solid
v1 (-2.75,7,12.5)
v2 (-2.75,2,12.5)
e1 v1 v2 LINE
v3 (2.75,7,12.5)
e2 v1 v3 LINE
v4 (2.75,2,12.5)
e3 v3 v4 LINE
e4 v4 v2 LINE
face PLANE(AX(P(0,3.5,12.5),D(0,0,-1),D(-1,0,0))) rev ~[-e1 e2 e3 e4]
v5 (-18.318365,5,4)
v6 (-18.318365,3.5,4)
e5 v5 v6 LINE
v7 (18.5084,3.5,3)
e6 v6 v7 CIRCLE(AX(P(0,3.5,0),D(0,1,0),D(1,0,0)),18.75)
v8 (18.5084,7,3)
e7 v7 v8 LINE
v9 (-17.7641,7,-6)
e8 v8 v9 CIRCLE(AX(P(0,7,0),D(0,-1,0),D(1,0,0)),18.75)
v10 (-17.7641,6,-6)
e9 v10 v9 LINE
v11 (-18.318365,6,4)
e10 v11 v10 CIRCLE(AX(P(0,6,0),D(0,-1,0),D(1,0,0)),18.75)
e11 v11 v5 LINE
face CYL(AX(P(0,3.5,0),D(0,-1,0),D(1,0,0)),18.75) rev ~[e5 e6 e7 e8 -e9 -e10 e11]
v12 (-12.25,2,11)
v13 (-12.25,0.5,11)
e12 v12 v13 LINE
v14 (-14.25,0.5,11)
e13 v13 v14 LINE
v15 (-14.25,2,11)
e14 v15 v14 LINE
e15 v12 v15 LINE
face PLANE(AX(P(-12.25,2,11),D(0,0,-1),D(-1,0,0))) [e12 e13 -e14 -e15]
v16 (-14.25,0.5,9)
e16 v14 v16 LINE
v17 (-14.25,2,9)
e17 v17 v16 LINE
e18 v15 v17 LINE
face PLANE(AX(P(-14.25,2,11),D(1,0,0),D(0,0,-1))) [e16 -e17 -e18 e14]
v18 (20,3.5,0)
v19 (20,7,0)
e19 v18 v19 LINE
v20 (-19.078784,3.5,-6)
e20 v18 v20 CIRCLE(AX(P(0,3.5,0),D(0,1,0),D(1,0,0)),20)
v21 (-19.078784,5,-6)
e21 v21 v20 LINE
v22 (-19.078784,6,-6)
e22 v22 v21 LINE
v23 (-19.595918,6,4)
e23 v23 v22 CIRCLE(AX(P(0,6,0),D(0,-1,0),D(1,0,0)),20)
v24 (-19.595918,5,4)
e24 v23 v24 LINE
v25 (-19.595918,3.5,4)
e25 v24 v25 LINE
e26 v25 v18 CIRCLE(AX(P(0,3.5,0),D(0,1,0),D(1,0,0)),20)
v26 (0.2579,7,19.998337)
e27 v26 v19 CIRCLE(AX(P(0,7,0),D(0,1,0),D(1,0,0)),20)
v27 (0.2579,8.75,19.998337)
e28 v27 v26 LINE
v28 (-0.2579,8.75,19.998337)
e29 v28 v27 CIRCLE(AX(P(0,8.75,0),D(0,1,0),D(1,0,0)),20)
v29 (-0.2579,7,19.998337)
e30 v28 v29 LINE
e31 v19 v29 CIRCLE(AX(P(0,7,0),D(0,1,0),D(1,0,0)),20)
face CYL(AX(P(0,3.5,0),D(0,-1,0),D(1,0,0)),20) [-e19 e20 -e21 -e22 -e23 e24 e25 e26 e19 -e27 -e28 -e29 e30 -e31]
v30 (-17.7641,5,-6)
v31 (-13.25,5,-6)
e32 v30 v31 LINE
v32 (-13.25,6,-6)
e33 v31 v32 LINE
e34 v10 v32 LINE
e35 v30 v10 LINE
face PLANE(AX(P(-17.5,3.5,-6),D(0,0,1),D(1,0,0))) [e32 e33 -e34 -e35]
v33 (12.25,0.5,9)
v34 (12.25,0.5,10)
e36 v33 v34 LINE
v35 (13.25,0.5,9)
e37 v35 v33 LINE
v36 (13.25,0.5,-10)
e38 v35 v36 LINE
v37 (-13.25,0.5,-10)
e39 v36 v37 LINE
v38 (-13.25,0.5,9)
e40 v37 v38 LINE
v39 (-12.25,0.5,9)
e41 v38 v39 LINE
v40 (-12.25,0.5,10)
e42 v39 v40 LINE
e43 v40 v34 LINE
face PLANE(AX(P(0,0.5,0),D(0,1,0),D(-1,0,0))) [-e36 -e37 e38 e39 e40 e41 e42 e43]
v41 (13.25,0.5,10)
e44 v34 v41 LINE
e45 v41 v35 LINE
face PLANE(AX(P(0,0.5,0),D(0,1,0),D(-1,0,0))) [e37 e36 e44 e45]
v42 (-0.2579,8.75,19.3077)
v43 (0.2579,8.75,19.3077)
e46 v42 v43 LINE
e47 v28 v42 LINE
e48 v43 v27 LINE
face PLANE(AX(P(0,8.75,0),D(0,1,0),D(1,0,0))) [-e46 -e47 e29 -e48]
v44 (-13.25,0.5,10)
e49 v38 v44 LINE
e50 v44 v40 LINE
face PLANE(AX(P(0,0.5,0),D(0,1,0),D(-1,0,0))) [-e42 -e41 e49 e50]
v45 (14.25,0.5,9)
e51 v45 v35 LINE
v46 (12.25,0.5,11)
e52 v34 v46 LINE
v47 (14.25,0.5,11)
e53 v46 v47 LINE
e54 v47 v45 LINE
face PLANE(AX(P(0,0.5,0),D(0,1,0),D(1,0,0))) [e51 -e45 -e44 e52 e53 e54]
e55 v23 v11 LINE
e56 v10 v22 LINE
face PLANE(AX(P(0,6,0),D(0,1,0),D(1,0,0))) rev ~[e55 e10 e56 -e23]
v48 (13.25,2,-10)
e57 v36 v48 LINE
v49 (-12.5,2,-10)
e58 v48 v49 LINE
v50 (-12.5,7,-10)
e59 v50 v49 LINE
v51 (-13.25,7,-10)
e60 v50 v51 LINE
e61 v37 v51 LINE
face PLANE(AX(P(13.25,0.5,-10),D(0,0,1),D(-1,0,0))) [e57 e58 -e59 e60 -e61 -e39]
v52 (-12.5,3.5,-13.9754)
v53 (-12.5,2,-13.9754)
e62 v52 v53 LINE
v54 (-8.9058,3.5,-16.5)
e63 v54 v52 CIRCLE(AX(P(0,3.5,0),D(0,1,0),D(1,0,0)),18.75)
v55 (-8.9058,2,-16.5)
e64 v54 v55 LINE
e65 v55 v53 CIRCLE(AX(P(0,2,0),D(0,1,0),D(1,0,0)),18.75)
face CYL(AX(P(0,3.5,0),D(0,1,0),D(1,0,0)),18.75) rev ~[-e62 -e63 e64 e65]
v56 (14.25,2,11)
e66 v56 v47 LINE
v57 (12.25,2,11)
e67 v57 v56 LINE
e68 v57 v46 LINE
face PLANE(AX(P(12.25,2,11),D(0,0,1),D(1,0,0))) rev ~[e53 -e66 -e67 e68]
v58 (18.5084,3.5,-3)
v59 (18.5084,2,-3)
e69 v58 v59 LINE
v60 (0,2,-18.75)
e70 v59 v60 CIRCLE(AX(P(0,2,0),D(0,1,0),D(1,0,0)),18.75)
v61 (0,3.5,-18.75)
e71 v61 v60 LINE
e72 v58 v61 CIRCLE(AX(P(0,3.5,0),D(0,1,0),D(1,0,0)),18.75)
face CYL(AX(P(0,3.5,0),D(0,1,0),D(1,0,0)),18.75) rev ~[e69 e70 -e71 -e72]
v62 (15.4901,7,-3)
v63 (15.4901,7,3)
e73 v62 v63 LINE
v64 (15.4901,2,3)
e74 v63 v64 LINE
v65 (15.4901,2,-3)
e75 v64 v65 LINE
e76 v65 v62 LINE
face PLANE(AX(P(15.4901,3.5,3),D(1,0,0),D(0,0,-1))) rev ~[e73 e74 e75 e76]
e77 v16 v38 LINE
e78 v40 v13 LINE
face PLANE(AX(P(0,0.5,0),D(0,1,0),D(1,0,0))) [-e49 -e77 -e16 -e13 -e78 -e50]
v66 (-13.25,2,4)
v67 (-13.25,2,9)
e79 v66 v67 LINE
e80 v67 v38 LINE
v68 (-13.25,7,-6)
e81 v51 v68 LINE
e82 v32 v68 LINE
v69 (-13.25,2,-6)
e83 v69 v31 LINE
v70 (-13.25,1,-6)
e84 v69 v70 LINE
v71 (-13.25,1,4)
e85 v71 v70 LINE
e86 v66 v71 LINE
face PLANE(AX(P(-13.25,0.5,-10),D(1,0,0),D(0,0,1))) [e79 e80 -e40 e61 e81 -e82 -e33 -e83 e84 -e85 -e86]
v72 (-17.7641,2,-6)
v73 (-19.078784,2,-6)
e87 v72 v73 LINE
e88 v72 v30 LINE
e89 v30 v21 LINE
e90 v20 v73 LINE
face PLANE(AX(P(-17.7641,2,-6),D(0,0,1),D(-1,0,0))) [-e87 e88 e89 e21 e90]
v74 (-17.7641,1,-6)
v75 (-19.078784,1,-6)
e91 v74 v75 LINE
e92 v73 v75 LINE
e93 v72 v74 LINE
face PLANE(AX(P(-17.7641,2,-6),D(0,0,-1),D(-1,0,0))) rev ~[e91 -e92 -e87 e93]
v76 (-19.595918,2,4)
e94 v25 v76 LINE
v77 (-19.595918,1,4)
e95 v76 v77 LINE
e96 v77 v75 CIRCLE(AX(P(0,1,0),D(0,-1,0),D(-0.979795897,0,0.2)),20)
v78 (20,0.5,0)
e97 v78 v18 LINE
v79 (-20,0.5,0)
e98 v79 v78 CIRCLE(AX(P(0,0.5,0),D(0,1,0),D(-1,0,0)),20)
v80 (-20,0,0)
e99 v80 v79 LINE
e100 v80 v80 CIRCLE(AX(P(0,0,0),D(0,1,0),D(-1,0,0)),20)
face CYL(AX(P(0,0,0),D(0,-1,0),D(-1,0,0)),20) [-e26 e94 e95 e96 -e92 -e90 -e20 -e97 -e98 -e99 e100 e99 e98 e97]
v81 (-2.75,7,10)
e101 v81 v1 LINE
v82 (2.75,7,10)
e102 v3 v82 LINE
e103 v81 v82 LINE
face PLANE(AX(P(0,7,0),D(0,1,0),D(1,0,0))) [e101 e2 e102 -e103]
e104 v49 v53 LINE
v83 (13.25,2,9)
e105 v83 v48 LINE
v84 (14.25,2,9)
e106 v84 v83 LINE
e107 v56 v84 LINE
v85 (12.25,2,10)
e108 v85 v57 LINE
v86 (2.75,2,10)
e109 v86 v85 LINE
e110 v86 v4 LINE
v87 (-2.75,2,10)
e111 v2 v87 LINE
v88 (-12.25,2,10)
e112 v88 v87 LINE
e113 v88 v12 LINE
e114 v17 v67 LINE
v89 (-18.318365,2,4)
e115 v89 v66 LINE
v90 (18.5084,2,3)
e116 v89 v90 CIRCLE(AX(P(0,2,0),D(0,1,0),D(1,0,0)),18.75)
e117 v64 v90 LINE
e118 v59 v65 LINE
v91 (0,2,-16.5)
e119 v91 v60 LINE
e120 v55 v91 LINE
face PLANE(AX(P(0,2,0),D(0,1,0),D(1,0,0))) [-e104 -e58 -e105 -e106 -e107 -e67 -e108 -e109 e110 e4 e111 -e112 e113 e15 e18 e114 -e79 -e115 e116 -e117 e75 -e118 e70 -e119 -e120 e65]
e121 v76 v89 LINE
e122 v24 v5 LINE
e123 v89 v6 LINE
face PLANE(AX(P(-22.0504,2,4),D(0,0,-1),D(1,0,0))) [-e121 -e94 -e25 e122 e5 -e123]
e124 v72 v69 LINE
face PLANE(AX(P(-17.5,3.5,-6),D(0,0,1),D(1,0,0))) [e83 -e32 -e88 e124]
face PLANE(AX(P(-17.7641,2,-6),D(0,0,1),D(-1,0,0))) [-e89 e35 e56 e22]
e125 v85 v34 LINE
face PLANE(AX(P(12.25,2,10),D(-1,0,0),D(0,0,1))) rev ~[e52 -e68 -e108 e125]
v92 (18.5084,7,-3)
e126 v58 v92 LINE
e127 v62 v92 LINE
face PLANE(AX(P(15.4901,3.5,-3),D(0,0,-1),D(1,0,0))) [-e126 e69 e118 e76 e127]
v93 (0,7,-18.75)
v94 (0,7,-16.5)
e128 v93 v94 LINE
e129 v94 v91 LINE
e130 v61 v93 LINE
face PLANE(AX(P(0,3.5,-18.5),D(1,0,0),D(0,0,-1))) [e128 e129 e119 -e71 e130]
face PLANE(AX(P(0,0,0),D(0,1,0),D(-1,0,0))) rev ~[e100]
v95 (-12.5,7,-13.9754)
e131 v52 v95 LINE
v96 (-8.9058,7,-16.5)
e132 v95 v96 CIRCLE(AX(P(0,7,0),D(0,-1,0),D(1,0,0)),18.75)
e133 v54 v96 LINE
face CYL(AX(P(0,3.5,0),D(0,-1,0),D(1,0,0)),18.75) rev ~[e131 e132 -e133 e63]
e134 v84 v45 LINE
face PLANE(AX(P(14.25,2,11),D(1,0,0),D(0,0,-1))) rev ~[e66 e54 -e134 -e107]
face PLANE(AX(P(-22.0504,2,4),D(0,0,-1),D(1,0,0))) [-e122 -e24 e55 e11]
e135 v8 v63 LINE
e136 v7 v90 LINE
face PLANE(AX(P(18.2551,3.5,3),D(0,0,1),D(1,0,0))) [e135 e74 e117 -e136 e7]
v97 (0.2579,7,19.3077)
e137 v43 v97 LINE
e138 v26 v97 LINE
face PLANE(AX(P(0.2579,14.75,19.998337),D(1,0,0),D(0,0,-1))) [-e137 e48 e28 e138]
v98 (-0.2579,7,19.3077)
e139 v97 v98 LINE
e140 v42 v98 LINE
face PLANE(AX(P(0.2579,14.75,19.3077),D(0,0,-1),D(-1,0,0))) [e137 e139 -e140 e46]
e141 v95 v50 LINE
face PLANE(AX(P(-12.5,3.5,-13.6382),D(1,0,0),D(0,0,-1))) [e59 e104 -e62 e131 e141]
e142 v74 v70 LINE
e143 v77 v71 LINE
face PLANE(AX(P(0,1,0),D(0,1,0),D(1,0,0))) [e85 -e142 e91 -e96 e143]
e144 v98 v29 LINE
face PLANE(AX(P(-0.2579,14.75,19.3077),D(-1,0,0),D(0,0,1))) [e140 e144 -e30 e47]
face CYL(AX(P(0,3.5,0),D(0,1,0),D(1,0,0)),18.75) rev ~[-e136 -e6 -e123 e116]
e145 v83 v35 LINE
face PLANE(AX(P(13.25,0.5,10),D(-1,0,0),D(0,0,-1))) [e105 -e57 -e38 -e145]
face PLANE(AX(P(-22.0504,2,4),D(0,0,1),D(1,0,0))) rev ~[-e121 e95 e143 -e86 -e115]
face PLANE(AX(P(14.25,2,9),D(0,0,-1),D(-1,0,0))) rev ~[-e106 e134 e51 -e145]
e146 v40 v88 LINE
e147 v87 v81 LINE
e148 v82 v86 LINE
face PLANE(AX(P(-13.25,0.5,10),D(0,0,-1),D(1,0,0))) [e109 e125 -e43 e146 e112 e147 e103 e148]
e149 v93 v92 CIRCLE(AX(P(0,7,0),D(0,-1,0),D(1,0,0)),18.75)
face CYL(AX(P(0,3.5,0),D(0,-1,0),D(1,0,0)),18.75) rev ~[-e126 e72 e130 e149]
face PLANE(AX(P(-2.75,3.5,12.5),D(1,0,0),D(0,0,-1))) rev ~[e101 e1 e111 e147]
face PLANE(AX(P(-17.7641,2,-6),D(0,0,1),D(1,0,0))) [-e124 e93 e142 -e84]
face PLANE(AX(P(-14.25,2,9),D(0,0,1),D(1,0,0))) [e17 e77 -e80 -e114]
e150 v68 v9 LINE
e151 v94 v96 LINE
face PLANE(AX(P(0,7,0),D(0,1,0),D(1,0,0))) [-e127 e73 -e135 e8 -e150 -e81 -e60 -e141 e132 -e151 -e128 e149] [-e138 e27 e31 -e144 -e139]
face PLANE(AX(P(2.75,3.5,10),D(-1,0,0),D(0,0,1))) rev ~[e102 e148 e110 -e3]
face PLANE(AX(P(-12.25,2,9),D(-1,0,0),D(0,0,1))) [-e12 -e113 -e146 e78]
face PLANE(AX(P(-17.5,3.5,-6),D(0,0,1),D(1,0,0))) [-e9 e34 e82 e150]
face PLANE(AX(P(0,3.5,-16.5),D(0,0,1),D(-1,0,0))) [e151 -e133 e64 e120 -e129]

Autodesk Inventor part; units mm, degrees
ref_plane "YZ Plane" through (0, 0, 0) normal (1, 0, 0) x (0, 1, 0)
ref_plane "XZ Plane" through (0, 0, 0) normal (0, 1, 0) x (-1, 0, 0)
sketch "Sketch1" plane through (0, 0, 0) normal (0, 1, 0) x (-1, 0, 0)
  circle A0 centre (0, 0) radius 20
  dimension "d0" = 40
extrude "Extrusion1" add sketch "Sketch1" along normal blind 0.5
sketch "Sketch2" plane through (0, 0.5, 0) normal (0, 1, 0) x (1, 0, 0)
  line L0 (-13.25, -10) -> (13.25, -10)
  line L1 (13.25, -10) -> (13.25, 10)
  line L2 (13.25, 10) -> (-13.25, 10)
  line L3 (-13.25, 10) -> (-13.25, -10)
  line L4 (-13.25, -10) -> (13.25, 10) construction
  line L5 (13.25, -10) -> (-13.25, 10) construction
  circle A0 centre (0, 0) radius 20
  dimension "d3" = 26.5
  dimension "d4" = 20
extrude "Extrusion2" add sketch "Sketch2" along normal blind 3
ref_plane "Work Plane1" through (0, 3.5, 0) normal (0, 1, 0) x (1, 0, 0)
sketch "Sketch3" plane through (0, 3.5, 0) normal (0, 1, 0) x (1, 0, 0)
  line L0 (16.25, 0) -> (16.25, 3)
  line L1 (16.25, 3) -> (18.2551, 3)
  line L2 (16.25, 0) -> (16.25, -3)
  line L3 (16.25, -3) -> (18.2551, -3)
  line L4 (0, -18.5) -> (0, -12.5)
  line L5 (0, -12.5) -> (2.75, -12.5)
  line L6 (2.75, -12.5) -> (-2.75, -12.5)
  line L7 (-2.75, -12.5) -> (-2.75, -10)
  line L8 (-2.75, -10) -> (2.75, -10)
  line L9 (2.75, -10) -> (2.75, -12.5)
  line L10 (-17.5, 6) -> (-13.25, 6)
  line L11 (-12.5, 10) -> (-12.5, 13.6382)
  line L12 (0, 18.5) -> (0, 16.5)
  line L13 (0, 16.5) -> (-8.3666, 16.5)
  line L14 (18.2551, -3) -> (15.4901, -3)
  line L15 (15.4901, -3) -> (15.4901, 3)
  line L16 (15.4901, 3) -> (16.25, 3)
  circle A0 centre (0, 0) radius 18.75
  line L17 (18.2551, 3) -> (18.5084, 3)
  line L18 (18.2551, -3) -> (18.5084, -3)
  line L19 (0, 18.5) -> (0, 18.75)
  line L20 (-8.3666, 16.5) -> (-8.9058, 16.5)
  line L21 (-17.5, 6) -> (-17.7641, 6)
  line L22 (-12.5, 13.6382) -> (-12.5, 13.9754)
  line L23 (-13.25, 10) -> (13.25, 10) projected
  line L24 (-12.5, 10) -> (-13.25, 10)
  line L25 (-13.25, 10) -> (-13.25, 6)
  line L26 (-13.25, -10) -> (-13.25, 10) projected
  circle A1 centre (0, 0) radius 20
  dimension "d8" = 6
  dimension "d9" = 2.75
  dimension "d10" = 5.5
  dimension "d11" = 2
  dimension "d12" = 2.765
  dimension "d13" = 37.5
extrude "Extrusion3" cut sketch "Sketch3" against normal blind 1.5 contours L16 L15 L14 L3 L18 A0 L21 L10 L25 L23 L11 L22 L20 L13 L12 L19 L17 L1
extrude "Extrusion4" add sketch "Sketch3" along normal blind 5.25 contours L2 L14 L15 L16 L0 | L0 L1 L17 A0 L18 L3 L2 | L19 L12 L13 L20 A0 | A0 L22 L11 L23 L25 L10 L21 | L6 L7 L8 L9 L5
extrude "Extrusion5" add sketch "Sketch3" along normal blind 5.25 contours A1
sketch "Sketch4" plane through (0, 2, 0) normal (0, 1, 0) x (1, 0, 0)
  line L0 (14.25, -9) -> (12.25, -9)
  line L1 (12.25, -9) -> (12.25, -11)
  line L2 (12.25, -11) -> (14.25, -11)
  line L3 (14.25, -11) -> (14.25, -9)
  line L4 (2.75, -10) -> (13.25, -10) projected
  line L5 (14.25, -9) -> (12.25, -11) construction
  line L6 (12.25, -9) -> (14.25, -11) construction
  point P0 (0, 0)
  dimension "d20" = 2
  dimension "d21" = 2
extrude "Extrusion6" cut sketch "Sketch4" against normal blind 1.5
sketch "Sketch5" plane through (0, 8.75, 0) normal (0, 1, 0) x (1, 0, 0)
  circle A0 centre (0, 0) radius 19.25
  circle A1 centre (0, 0) radius 20
  circle A2 centre (0, 0) radius 19.5
  dimension "d24" = 38.5
  dimension "d25" = 39
extrude "Extrusion7" add sketch "Sketch5" along normal blind 5 contours A1 | A2
extrude "Extrusion8" add sketch "Sketch5" along normal blind 6 contours A1
sketch "Sketch6" plane through (0, 14.75, 0) normal (0, 1, 0) x (1, 0, 0)
  line L0 (-0.2579, -20.6923) -> (0.2579, -20.6923)
  line L1 (0.2579, -20.6923) -> (0.2579, -19.3077)
  line L2 (0.2579, -19.3077) -> (-0.2579, -19.3077)
  line L3 (-0.2579, -19.3077) -> (-0.2579, -20.6923)
  circle A0 centre (0, 0) radius 20 projected
  line L4 (-0.2579, -20.6923) -> (0.2579, -19.3077) construction
  line L5 (0.2579, -20.6923) -> (-0.2579, -19.3077) construction
  point P0 (0, -20)
  point P1 (0.2579, -19.9983)
  point P2 (-0.2579, -19.9983)
extrude "Extrusion9" add sketch "Sketch6" along normal blind 1 contours L3 A0 L1 L0 | L3 L2 L1 A0 picked at (-0.0287, -19.5384)
sketch "Sketch7" plane through (0.2579, 14.75, 20.6923) normal (1, 0, 0) x (0, 0, -1)
  line L0 (0, 0) -> (0.6939, 0) projected
  line L1 (0.6939, 0) -> (0.9439, 0)
  line L2 (1.194, 0) -> (0.6939, 0) projected
  circle A0 centre (0.9439, 0) radius 0.25
  line L3 (1.194, 0) -> (1.3845, 0) projected
  line L4 (1.194, 0) -> (2.041, 0)
  point P0 (20.6923, -14.75)
  point P1 (0.6939, 0)
  dimension "d32" = 0.25
extrude "Extrusion10" cut sketch "Sketch6" along normal blind 1 contours L3 A0 L1 L0 | L3 L2 L1 A0 picked at (-0.0287, -19.5384)
sketch "Sketch8" plane through (0, 2, 0) normal (0, 1, 0) x (1, 0, 0)
  line L0 (-17.7641, 6) -> (-13.25, 6) projected
  line L1 (-13.25, 6) -> (-22.0504, 6)
  line L2 (-22.0504, 6) -> (-22.0504, -4)
  line L3 (-22.0504, -4) -> (-13.25, -4)
  line L4 (-13.25, -4) -> (-13.25, 6)
  point P0 (0, 0)
  dimension "d37" = 10
extrude "Extrusion11" cut sketch "Sketch8" against normal blind 1
extrude "Extrusion12" cut sketch "Sketch8" along normal blind 3
extrude "Extrusion13" cut sketch "Sketch8" along normal blind 4
sketch "Sketch9" plane through (0, 2, 0) normal (0, 1, 0) x (1, 0, 0)
  line L0 (-12.25, -11) -> (-14.25, -11)
  line L1 (-14.25, -11) -> (-14.25, -9)
  line L2 (-14.25, -9) -> (-12.25, -9)
  line L3 (-12.25, -9) -> (-12.25, -11)
  line L4 (-12.25, -11) -> (-14.25, -9) construction
  line L5 (-14.25, -11) -> (-12.25, -9) construction
  point P0 (0, 0)
  point P1 (-13.25, -10)
  dimension "d44" = 2
  dimension "d45" = 2
extrude "Extrusion14" cut sketch "Sketch9" against normal blind 1.5
extrude "Extrusion15" cut sketch "Sketch6" against normal blind 7.75 contours A0 L1 L2 L3 picked at (-0.5744, 6.7866)
extrude "Extrusion16" cut sketch "Sketch5" along normal blind 7.75 contours A0 | A1 | A2
properties part number "t2"
